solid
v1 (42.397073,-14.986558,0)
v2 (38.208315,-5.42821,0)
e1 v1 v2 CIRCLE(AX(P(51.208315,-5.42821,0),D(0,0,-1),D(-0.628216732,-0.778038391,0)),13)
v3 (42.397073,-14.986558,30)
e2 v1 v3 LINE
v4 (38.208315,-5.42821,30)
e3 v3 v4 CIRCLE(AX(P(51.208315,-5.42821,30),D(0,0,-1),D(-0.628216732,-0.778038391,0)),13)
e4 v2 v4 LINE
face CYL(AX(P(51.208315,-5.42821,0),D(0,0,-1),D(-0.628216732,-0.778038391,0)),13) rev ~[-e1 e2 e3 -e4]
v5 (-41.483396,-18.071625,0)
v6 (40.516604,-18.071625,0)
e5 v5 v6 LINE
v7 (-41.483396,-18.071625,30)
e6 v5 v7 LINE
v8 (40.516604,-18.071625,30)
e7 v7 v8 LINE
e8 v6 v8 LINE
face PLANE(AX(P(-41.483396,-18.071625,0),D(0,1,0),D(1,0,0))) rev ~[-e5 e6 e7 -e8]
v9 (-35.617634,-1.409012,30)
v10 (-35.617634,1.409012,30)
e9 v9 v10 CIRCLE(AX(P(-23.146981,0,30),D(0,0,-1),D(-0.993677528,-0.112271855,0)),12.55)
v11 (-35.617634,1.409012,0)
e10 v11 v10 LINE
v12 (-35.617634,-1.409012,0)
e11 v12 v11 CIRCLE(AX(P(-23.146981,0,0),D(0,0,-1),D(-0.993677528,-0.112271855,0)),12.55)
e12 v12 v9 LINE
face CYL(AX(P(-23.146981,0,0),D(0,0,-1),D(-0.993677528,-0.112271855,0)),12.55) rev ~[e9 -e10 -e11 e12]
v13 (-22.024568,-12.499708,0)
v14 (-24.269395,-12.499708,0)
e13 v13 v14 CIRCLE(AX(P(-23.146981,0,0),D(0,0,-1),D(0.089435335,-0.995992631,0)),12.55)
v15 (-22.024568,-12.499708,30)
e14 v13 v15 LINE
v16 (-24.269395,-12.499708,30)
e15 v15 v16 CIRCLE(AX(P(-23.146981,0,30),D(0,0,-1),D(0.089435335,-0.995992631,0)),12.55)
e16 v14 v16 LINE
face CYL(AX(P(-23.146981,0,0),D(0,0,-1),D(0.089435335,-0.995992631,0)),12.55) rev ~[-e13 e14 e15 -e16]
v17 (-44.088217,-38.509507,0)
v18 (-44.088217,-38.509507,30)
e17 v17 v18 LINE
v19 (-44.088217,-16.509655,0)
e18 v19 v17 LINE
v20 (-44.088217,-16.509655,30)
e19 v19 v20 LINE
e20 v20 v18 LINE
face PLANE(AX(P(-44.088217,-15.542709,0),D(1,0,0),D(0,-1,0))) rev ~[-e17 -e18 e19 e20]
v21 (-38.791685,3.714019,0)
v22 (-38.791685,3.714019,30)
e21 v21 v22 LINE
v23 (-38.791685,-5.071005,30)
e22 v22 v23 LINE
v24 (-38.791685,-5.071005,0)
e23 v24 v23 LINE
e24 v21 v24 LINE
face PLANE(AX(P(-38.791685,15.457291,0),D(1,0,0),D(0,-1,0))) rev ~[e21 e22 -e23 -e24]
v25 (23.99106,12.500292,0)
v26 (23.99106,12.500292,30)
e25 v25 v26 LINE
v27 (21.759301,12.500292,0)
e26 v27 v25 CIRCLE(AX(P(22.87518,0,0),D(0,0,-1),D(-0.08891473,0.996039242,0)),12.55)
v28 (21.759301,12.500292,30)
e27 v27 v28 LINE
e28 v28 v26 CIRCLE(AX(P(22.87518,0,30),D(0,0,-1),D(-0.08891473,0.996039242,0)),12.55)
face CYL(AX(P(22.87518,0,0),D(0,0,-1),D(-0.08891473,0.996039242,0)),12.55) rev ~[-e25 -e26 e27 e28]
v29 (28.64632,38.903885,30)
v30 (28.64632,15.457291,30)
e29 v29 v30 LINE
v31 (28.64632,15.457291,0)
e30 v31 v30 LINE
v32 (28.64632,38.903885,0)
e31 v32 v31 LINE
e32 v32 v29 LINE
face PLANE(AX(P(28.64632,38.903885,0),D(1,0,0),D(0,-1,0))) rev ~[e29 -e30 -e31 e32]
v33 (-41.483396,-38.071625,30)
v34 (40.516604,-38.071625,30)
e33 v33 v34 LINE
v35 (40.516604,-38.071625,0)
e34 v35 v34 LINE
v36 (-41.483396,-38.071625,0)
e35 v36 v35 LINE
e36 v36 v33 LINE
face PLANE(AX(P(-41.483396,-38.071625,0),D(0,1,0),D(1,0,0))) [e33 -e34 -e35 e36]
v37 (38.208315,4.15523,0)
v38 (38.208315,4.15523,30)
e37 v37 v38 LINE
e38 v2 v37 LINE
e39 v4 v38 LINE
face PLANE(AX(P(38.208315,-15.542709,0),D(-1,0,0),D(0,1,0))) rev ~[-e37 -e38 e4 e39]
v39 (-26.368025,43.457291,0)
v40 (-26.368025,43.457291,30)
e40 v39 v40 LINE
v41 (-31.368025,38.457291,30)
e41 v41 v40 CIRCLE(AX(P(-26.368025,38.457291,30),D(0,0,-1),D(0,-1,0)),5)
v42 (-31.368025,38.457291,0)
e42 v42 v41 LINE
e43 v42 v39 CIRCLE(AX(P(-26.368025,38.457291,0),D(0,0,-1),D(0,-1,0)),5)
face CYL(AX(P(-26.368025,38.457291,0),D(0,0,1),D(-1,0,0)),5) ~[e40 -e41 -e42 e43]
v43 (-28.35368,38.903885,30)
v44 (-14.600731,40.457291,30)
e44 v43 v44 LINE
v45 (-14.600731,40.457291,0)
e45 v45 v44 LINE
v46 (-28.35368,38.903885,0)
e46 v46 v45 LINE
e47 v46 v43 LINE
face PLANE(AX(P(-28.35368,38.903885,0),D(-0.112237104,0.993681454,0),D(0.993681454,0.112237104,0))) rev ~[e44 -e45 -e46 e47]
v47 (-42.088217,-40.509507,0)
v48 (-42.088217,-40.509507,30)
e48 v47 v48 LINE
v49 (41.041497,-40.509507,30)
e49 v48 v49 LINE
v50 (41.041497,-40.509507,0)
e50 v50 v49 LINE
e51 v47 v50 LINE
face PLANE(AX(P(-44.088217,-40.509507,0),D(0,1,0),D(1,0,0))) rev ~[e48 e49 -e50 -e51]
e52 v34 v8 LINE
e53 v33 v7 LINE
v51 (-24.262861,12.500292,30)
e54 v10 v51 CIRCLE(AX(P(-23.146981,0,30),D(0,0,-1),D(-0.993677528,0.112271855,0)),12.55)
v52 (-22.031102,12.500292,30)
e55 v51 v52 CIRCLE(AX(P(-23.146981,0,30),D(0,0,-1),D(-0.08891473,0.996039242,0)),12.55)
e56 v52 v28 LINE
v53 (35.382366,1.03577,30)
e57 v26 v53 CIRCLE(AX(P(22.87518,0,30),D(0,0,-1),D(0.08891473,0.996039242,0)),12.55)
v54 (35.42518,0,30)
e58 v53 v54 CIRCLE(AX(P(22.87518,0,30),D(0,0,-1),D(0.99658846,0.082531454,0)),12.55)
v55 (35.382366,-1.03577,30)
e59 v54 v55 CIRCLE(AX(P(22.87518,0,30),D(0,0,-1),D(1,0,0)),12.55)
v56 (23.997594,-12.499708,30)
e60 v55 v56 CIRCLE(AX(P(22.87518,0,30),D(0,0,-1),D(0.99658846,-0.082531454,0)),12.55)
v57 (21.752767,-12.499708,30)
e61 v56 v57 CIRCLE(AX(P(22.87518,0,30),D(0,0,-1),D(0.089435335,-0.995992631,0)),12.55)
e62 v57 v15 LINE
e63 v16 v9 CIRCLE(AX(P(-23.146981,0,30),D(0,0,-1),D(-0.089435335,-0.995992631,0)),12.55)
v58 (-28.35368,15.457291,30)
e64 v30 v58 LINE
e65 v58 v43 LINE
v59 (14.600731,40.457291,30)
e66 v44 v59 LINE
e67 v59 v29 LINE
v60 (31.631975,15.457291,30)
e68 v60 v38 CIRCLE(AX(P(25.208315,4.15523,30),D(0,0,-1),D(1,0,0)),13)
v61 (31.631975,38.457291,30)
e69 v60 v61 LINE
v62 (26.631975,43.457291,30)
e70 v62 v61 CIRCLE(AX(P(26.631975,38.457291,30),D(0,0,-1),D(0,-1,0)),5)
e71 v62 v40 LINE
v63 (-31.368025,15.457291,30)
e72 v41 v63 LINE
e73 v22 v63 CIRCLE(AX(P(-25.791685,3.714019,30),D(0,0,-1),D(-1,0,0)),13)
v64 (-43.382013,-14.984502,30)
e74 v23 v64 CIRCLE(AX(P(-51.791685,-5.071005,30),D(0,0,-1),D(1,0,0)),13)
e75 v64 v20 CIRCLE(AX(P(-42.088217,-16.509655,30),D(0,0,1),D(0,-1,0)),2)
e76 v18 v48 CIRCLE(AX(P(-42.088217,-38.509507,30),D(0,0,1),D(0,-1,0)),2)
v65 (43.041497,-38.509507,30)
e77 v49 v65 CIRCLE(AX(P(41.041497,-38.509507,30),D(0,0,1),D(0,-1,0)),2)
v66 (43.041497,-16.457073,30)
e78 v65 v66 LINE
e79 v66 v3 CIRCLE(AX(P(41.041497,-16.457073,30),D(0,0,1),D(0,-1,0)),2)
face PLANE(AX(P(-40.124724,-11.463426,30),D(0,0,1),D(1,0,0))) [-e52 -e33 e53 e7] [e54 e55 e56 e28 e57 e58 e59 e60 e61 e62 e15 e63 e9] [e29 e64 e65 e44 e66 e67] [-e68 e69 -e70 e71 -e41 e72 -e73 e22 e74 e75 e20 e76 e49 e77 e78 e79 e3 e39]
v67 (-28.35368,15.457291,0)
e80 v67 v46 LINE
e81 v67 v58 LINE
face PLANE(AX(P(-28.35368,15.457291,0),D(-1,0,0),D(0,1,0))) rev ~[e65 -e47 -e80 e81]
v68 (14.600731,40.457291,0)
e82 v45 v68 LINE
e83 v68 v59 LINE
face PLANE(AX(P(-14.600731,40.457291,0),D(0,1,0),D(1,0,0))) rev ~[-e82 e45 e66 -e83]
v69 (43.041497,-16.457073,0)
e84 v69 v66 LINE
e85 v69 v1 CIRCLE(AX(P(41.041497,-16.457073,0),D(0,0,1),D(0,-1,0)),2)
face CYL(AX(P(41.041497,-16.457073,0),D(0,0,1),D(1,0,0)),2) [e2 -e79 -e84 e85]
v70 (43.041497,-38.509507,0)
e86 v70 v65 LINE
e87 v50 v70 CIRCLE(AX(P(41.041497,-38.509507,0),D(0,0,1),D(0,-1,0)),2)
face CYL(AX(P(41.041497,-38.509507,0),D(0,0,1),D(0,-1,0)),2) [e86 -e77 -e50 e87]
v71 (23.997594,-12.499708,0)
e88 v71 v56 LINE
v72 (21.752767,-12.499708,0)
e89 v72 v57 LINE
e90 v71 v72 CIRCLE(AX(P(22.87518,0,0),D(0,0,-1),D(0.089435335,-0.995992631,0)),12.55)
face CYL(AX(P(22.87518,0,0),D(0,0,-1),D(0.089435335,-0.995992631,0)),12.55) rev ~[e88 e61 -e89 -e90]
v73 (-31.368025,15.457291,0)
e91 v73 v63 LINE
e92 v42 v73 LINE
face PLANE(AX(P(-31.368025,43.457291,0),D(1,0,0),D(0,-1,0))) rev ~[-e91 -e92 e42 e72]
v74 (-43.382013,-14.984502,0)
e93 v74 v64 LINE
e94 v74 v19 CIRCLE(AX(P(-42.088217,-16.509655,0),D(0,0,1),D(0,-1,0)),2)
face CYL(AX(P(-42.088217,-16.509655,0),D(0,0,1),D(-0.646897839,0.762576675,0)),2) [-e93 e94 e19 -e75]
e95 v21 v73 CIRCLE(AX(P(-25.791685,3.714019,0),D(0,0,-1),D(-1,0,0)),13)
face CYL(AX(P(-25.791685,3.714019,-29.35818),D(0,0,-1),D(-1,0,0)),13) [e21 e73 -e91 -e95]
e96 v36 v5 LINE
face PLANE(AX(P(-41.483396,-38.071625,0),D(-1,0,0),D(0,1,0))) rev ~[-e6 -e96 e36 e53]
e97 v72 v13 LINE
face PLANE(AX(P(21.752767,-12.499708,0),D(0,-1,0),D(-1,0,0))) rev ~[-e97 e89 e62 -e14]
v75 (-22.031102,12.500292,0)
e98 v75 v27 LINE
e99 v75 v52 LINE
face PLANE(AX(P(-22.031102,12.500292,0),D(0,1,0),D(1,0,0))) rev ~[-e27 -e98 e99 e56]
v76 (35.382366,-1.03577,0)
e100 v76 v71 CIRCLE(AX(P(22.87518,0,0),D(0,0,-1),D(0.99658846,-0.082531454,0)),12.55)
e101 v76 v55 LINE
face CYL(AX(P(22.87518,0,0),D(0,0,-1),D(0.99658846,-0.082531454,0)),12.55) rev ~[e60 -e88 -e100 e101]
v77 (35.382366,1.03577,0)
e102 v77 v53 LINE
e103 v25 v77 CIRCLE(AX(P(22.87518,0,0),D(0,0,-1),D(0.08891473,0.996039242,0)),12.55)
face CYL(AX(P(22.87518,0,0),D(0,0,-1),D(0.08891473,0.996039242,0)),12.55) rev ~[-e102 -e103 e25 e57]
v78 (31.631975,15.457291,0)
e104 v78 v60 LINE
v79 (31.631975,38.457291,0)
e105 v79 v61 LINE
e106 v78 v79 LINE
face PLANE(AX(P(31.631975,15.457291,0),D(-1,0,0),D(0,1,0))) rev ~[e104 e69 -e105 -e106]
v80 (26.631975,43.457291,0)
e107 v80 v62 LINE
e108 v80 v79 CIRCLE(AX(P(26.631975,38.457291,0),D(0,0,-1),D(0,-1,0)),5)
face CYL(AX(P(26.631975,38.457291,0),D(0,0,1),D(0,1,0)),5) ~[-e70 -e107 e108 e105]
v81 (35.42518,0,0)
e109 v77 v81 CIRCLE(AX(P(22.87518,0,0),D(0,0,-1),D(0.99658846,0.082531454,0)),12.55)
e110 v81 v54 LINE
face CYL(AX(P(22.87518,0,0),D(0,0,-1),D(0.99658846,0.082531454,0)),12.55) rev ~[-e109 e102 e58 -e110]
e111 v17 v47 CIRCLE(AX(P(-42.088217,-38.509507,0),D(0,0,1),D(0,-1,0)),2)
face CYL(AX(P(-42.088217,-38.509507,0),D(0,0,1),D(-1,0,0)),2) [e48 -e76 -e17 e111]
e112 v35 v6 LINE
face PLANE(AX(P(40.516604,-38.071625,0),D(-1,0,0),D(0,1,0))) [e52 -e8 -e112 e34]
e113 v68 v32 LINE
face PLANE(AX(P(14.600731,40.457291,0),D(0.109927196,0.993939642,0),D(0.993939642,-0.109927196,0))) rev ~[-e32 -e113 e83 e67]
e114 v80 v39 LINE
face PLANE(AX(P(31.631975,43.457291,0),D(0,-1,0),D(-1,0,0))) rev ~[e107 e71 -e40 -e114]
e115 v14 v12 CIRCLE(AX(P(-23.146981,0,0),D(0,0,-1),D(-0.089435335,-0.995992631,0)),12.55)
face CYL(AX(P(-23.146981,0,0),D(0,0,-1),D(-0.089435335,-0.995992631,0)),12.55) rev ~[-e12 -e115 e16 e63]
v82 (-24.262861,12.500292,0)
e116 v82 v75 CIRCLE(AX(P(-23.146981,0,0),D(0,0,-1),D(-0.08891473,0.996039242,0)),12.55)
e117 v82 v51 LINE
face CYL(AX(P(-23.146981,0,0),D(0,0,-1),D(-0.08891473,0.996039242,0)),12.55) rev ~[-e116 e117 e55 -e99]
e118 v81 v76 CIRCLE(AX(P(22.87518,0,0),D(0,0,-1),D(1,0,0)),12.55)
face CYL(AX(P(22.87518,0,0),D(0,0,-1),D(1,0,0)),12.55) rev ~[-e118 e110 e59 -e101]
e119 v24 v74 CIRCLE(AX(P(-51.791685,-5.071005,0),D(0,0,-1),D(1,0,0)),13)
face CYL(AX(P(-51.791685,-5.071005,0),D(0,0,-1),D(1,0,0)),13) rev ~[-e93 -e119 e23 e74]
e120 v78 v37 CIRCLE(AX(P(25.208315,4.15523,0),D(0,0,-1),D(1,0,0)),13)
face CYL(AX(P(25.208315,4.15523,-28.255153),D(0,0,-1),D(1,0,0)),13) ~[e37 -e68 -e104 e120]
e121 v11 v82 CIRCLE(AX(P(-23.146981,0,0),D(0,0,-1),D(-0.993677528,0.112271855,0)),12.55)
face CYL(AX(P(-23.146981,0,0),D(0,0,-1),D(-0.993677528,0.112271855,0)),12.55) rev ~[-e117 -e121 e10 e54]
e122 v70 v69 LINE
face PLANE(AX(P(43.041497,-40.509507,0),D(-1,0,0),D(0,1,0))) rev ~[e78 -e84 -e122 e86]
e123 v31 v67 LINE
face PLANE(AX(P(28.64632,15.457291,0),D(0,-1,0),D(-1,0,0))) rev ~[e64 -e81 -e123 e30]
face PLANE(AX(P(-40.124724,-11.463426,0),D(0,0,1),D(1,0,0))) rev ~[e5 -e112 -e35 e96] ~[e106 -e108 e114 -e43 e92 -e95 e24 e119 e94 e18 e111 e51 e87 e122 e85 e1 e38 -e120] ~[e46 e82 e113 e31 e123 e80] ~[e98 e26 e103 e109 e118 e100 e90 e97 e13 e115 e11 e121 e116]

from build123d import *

# Parameters (mm, degrees)
F0_W        = 82
F0_H        = 20
F1_DEPTH    = 30
F2_T1_DEPTH = 30
F2_T3_DEPTH = 88.7163597955
F2_T5_DEPTH = 86.5103060247
F3_R        = 5
F4_R        = 2


# Not quite as in the source:
# - a fillet or chamfer that OpenCascade refuses, or shapes differently, is made with other operations: its cross-section is extruded or revolved along the edge and cut away or added


with BuildPart() as f1:
    # F0 (on Top) → F1 (new body)
    with BuildSketch(Plane.XY):
        Polygon((-31.3680246472, 15.4572909642), (-38.791685015, 15.4572909642), (-38.791685015, -15.5427090358), (38.208314985, -15.5427090358), (38.208314985, 15.4572909642), (31.6319753528, 15.4572909642), (28.6463200748, 15.4572909642), (-28.3536799252, 15.4572909642), align=None)
        with BuildLine():
            Line((-35.617634356, 1.409011777), (-35.617634356, 12.5002924819))
            Line((-35.617634356, 12.5002924819), (-24.2628612362, 12.5002924819))
            ThreePointArc((-24.2628612362, 12.5002924819), (-23.1469813734, 12.55), (-22.0311015107, 12.5002924819))
            Line((-22.0311015107, 12.5002924819), (21.7593006052, 12.5002924819))
            ThreePointArc((21.7593006052, 12.5002924819), (22.875180468, 12.55), (23.9910603307, 12.5002924819))
            Line((23.9910603307, 12.5002924819), (35.382365644, 12.5002924819))
            Line((35.382365644, 12.5002924819), (35.382365644, 1.035769749))
            ThreePointArc((35.382365644, 1.035769749), (35.4144721936, 0.5183271366), (35.425180468, 0))
            ThreePointArc((35.425180468, 0), (35.4144721936, -0.5183271366), (35.382365644, -1.035769749))
            Line((35.382365644, -1.035769749), (35.382365644, -12.4997075181))
            Line((35.382365644, -12.4997075181), (23.9975939216, -12.4997075181))
            ThreePointArc((23.9975939216, -12.4997075181), (22.875180468, -12.55), (21.7527670144, -12.4997075181))
            Line((21.7527670144, -12.4997075181), (-22.0245679198, -12.4997075181))
            ThreePointArc((-22.0245679198, -12.4997075181), (-23.1469813734, -12.55), (-24.269394827, -12.4997075181))
            Line((-24.269394827, -12.4997075181), (-35.617634356, -12.4997075181))
            Line((-35.617634356, -12.4997075181), (-35.617634356, -1.409011777))
            ThreePointArc((-35.617634356, -1.409011777), (-35.6969813734, 0), (-35.617634356, 1.409011777))
        make_face(mode=Mode.SUBTRACT)
        Polygon((38.208314985, -15.5427090358), (-38.791685015, -15.5427090358), (-44.0882174298, -15.5427090358), (-44.0882174298, -40.5095070601), (43.0414974689, -40.5095070601), (43.0414974689, -15.5427090358), align=None)
        with Locations((-0.4833955318, -28.0716251582)):
            Rectangle(F0_W, F0_H, mode=Mode.SUBTRACT)
        Polygon((-31.3680246472, 43.4572909642), (-31.3680246472, 15.4572909642), (-28.3536799252, 15.4572909642), (-28.3536799252, 38.9038845897), (-28.3536799252, 40.4572909642), (-14.6007314324, 40.4572909642), (14.6007314324, 40.4572909642), (28.6463200748, 40.4572909642), (28.6463200748, 38.9038845897), (28.6463200748, 15.4572909642), (31.6319753528, 15.4572909642), (31.6319753528, 43.4572909642), align=None)
        with BuildLine():
            Line((35.382365644, 12.5002924819), (23.9910603307, 12.5002924819))
            ThreePointArc((23.9910603307, 12.5002924819), (31.7777528847, 8.8457167242), (35.382365644, 1.035769749))
            Line((35.382365644, 1.035769749), (35.382365644, 12.5002924819))
        make_face()
        with BuildLine():
            ThreePointArc((35.382365644, -1.035769749), (31.7800643524, -8.8433897915), (23.9975939216, -12.4997075181))
            Line((23.9975939216, -12.4997075181), (35.382365644, -12.4997075181))
            Line((35.382365644, -12.4997075181), (35.382365644, -1.035769749))
        make_face()
        with BuildLine():
            Line((-24.2628612362, 12.5002924819), (-35.617634356, 12.5002924819))
            Line((-35.617634356, 12.5002924819), (-35.617634356, 1.409011777))
            ThreePointArc((-35.617634356, 1.409011777), (-31.9163938742, 8.9777449503), (-24.2628612362, 12.5002924819))
        make_face()
        with BuildLine():
            ThreePointArc((-24.269394827, -12.4997075181), (-31.9187398511, -8.9754528136), (-35.617634356, -1.409011777))
            Line((-35.617634356, -1.409011777), (-35.617634356, -12.4997075181))
            Line((-35.617634356, -12.4997075181), (-24.269394827, -12.4997075181))
        make_face()
        Polygon((14.6007314324, 40.4572909642), (28.6463200748, 38.9038845897), (28.6463200748, 40.4572909642), align=None)
        Polygon((-28.3536799252, 40.4572909642), (-28.3536799252, 38.9038845897), (-14.6007314324, 40.4572909642), align=None)
    extrude(amount=F1_DEPTH)

    # F2: fillet of radius 13 on 4 edges, made by hand

    # F2_s2 → F2_t1 (join)
    with BuildSketch(Plane.XY):
        with BuildLine():
            ThreePointArc((-38.791685015, -5.0710049164), (-40.1911445403, -10.9384967738), (-44.0882174298, -15.5427090358))
            Line((-44.0882174298, -15.5427090358), (-38.791685015, -15.5427090358))
            Line((-38.791685015, -15.5427090358), (-38.791685015, -5.0710049164))
        make_face()
        with BuildLine():
            ThreePointArc((43.0414974689, -15.5427090358), (39.4786809816, -11.0331797269), (38.208314985, -5.4282099548))
            Line((38.208314985, -5.4282099548), (38.208314985, -15.5427090358))
            Line((38.208314985, -15.5427090358), (43.0414974689, -15.5427090358))
        make_face()
    extrude(amount=F2_T1_DEPTH)

    # F2_s4 → F2_t3 (cut)
    with BuildSketch(Plane.XY.offset(-29.3581798978)):
        with BuildLine():
            ThreePointArc((-38.791685015, 3.7140190051), (-36.7801429418, 10.6605139767), (-31.3680246472, 15.4572909642))
            Line((-31.3680246472, 15.4572909642), (-38.791685015, 15.4572909642))
            Line((-38.791685015, 15.4572909642), (-38.791685015, 3.7140190051))
        make_face()
    extrude(amount=F2_T3_DEPTH, mode=Mode.SUBTRACT)

    # F2_s6 → F2_t5 (cut)
    with BuildSketch(Plane.XY.offset(-28.2551530123)):
        with BuildLine():
            ThreePointArc((38.208314985, 4.1552297593), (36.44458627, 10.6932881568), (31.6319753528, 15.4572909642))
            Line((31.6319753528, 15.4572909642), (38.208314985, 15.4572909642))
            Line((38.208314985, 15.4572909642), (38.208314985, 4.1552297593))
        make_face()
    extrude(amount=F2_T5_DEPTH, mode=Mode.SUBTRACT)

    # F3
    f3_edges = [f1.edges().sort_by_distance(p)[0] for p in [
        (31.631975, 43.457291, 15),
        (-31.368025, 43.457291, 15),
    ]]
    fillet(f3_edges, radius=F3_R)

    # F4
    f4_edges = [f1.edges().sort_by_distance(p)[0] for p in [
        (-44.088217, -15.542709, 15),
        (-44.088217, -40.509507, 15),
        (43.041497, -40.509507, 15),
        (43.041497, -15.542709, 15),
    ]]
    fillet(f4_edges, radius=F4_R)


solid = f1.part
